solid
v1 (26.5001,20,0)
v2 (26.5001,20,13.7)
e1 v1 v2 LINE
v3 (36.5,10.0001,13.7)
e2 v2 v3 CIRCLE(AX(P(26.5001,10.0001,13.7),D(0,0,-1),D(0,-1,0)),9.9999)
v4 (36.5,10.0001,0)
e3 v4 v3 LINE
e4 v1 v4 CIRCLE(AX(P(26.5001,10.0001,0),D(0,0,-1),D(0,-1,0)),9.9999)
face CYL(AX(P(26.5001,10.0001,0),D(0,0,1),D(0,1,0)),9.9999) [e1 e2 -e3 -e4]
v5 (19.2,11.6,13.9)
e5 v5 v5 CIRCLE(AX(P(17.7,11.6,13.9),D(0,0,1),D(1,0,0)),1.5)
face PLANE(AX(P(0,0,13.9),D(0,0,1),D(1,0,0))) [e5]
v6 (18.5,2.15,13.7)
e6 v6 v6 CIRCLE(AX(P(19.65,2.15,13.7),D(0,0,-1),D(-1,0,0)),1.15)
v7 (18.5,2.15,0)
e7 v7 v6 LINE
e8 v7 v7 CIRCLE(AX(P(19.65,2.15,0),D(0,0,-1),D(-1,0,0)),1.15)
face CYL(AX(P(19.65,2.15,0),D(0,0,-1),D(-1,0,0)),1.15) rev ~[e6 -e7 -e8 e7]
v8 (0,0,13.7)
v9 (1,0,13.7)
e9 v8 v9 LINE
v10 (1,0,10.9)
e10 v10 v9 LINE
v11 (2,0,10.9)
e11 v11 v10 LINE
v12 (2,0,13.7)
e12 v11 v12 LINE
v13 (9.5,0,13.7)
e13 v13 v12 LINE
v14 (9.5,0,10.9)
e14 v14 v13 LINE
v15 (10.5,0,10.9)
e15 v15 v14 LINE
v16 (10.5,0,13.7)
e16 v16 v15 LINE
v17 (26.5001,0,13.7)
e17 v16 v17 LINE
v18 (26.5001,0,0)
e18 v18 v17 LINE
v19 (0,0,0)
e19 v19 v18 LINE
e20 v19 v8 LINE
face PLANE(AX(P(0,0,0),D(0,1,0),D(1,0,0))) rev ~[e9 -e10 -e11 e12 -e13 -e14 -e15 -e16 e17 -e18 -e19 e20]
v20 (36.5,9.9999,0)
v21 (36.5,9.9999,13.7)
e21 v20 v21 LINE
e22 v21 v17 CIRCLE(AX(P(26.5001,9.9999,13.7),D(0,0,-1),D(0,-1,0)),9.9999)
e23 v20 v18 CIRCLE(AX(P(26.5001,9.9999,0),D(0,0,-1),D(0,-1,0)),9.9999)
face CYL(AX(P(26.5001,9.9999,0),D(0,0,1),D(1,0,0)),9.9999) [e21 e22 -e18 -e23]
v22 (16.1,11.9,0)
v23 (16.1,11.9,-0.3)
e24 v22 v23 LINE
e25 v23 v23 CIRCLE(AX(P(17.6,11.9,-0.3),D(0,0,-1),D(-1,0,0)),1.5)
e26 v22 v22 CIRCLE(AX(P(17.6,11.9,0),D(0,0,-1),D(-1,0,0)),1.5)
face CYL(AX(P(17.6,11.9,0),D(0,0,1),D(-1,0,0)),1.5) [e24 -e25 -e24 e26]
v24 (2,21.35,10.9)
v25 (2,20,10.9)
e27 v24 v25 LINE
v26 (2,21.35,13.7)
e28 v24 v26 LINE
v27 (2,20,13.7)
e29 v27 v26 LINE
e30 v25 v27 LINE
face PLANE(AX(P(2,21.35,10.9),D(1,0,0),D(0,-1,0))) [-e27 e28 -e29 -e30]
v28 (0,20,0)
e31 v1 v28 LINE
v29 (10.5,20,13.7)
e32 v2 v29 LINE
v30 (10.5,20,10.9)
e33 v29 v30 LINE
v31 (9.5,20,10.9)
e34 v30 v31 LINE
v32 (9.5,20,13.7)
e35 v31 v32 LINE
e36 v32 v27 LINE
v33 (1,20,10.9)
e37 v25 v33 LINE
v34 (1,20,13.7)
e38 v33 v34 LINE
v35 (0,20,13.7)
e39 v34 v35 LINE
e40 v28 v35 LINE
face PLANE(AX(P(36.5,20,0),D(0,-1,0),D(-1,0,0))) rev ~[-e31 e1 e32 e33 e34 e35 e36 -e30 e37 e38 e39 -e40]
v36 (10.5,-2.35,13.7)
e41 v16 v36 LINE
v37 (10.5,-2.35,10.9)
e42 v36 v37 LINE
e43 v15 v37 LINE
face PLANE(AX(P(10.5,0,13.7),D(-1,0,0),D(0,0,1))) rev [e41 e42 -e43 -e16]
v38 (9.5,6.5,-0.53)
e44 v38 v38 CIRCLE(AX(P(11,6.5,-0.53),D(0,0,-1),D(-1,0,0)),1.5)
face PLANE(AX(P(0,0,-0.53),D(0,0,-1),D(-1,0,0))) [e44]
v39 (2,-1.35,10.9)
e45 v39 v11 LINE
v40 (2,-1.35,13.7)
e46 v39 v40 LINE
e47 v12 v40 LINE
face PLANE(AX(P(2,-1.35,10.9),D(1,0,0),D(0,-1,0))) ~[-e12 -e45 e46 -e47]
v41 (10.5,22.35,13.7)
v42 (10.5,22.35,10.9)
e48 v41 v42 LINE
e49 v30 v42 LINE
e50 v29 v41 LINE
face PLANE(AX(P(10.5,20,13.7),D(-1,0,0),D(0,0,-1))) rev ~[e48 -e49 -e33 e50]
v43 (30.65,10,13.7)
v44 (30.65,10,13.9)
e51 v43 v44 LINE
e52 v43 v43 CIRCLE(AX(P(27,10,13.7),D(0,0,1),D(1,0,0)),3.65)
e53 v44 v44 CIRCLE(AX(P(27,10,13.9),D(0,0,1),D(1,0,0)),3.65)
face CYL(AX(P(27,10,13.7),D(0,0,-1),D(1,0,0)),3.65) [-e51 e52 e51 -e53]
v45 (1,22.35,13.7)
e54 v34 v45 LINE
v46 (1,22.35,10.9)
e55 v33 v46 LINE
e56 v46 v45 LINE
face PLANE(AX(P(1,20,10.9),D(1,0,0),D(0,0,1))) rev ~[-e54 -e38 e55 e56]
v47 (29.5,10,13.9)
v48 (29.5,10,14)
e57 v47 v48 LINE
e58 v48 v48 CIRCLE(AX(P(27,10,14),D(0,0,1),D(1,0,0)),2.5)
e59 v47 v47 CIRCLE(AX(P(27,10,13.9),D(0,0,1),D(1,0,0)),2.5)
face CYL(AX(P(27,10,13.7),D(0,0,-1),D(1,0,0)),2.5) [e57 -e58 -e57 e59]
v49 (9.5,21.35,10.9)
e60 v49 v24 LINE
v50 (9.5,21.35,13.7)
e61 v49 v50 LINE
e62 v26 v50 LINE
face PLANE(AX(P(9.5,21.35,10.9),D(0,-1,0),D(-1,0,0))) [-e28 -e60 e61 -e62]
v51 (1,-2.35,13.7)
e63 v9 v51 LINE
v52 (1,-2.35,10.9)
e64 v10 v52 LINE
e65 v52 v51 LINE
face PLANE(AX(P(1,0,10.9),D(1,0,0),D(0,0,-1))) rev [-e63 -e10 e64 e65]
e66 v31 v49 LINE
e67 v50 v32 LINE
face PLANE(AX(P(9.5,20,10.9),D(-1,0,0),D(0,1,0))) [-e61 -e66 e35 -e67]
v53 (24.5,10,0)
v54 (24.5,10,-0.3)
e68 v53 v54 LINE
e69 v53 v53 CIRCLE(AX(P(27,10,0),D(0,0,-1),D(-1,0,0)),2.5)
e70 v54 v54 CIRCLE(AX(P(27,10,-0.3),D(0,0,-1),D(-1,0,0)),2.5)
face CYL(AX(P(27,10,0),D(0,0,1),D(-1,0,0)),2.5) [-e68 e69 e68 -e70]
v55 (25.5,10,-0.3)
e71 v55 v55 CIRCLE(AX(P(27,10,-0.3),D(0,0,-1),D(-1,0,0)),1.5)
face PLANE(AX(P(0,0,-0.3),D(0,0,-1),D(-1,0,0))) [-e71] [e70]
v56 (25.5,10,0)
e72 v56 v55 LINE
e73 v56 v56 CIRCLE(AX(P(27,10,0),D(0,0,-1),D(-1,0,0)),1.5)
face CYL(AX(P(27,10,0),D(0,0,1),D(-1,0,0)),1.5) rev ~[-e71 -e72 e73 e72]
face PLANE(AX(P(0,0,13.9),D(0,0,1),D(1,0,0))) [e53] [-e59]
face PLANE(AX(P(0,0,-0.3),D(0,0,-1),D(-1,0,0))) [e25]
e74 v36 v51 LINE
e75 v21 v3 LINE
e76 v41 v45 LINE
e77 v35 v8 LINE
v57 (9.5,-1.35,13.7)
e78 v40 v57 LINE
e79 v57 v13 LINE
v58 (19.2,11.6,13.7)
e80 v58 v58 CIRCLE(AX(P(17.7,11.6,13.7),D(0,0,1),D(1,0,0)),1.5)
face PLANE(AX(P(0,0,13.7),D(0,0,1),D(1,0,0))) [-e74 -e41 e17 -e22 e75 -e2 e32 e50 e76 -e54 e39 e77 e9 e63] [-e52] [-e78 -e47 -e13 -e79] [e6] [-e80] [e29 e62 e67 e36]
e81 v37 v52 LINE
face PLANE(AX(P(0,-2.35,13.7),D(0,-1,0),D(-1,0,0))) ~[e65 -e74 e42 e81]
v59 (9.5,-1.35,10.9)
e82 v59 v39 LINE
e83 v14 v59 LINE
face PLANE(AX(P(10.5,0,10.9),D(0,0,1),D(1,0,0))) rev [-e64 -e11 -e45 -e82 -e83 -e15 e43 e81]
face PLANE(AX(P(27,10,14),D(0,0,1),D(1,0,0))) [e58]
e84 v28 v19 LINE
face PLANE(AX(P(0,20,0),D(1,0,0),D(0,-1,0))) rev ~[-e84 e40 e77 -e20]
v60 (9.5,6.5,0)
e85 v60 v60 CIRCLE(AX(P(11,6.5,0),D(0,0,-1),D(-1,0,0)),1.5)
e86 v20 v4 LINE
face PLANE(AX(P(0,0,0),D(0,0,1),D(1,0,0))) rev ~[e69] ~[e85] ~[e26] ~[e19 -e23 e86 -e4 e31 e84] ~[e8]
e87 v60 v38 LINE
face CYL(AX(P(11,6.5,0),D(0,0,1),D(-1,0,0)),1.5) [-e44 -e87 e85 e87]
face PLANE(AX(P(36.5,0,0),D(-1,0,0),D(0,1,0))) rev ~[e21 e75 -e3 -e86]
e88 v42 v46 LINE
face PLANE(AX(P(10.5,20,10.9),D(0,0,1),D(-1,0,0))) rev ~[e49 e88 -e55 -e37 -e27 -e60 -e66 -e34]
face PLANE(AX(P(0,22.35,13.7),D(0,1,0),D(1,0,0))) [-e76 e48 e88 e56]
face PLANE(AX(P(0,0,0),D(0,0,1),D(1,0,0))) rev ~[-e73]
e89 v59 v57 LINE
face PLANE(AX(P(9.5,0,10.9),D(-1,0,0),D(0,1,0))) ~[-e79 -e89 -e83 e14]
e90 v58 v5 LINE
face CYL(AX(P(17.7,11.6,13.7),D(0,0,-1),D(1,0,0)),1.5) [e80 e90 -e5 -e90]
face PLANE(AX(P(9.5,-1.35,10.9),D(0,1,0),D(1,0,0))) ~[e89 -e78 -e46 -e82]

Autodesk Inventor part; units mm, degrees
ref_plane "YZ Plane" through (0, 0, 0) normal (1, 0, 0) x (0, 1, 0)
ref_plane "XZ Plane" through (0, 0, 0) normal (0, 1, 0) x (-1, 0, 0)
sketch "Skizze1" plane through (0, 0, 0) normal (0, 0, 1) x (1, 0, 0)
  line L0 (0, 0) -> (36.5, 0)
  line L1 (36.5, 0) -> (36.5, 20)
  line L2 (36.5, 20) -> (0, 20)
  line L3 (0, 20) -> (0, 0)
  dimension "d0" = 36.5
  dimension "d1" = 20
extrude "Extrusion1" add sketch "Skizze1" along normal blind 13.7
ref_plane "Arbeitsebene1" through (0, 10, 0) normal (0, 1, 0) x (1, 0, 0)
fillet "Rundung1" radius 10 2 edges at (36.5, 20, 6.85) (36.5, 0, 6.85)
sketch "Skizze2" plane through (0, 0, 0) normal (0, 0, -1) x (-1, 0, 0)
  arc A0 (-26.5, 20) -> (-26.5, 0) centre (-26.5, 10) ccw projected
  circle A1 centre (-27, 10) radius 2.5
  circle A2 centre (-27, 10) radius 1.5
  dimension "d5" = 5
  dimension "d6" = 10
  dimension "d7" = 12
  dimension "d8" = 3
extrude "Extrusion2" add sketch "Skizze2" along normal blind 0.3
sketch "Skizze4" plane through (0, 0, 0) normal (0, 0, -1) x (-1, 0, 0)
  line L0 (0, 0) -> (-26.5, 0) projected
  line L1 (0, 20) -> (0, 0) projected
  circle A0 centre (-19.65, 2.15) radius 1.15
  dimension "d15" = 2.3
  dimension "d16" = 1
  dimension "d17" = 18.5
extrude "Extrusion4" cut sketch "Skizze4" against normal through all
sketch "Skizze5" plane through (0, 0, 0) normal (0, 0, -1) x (-1, 0, 0)
  line L0 (0, 0) -> (-26.5, 0) projected
  line L1 (0, 20) -> (0, 0) projected
  circle A0 centre (-11, 6.5) radius 1.5
  dimension "d21" = 3
  dimension "d23" = 5
  dimension "d24" = 9.5
extrude "Extrusion8" add sketch "Skizze5" along normal blind 0.53
sketch "Skizze6" plane through (0, 0, 0) normal (0, 0, -1) x (-1, 0, 0)
  line L0 (0, 20) -> (0, 0) projected
  line L1 (-26.5, 20) -> (0, 20) projected
  circle A0 centre (-17.6, 11.9) radius 1.5
  dimension "d27" = 3
  dimension "d28" = 6.6
  dimension "d29" = 16.1
extrude "Extrusion5" add sketch "Skizze6" along normal up to surface (0.3 mm away)
sketch "Skizze7" plane through (0, 0, 13.7) normal (0, 0, 1) x (1, 0, 0)
  line L0 (0, 20) -> (0, 0) projected
  line L1 (0, 0) -> (26.5, 0) projected
  circle A0 centre (27, 10) radius 2.5 projected
  circle A1 centre (27, 10) radius 3.65
  circle A2 centre (17.7, 11.6) radius 1.5
  dimension "d34" = 7.3
  dimension "d40" = 3
  dimension "d42" = 10.1
  dimension "d43" = 19.2
extrude "Extrusion9" add sketch "Skizze7" along normal blind 0.2
sketch "Skizze8" plane through (27, 10, 13.7) normal (0, 0, 1) x (1, 0, 0)
  circle A0 centre (0, 0) radius 2.5 projected
  point P0 (-27, -10)
extrude "Extrusion10" add sketch "Skizze8" along normal blind 0.3
sketch "Skizze11" plane through (0, 20, 13.7) normal (0, 1, 0) x (1, 0, 0)
  line L0 (0, 13.7) -> (0, 0) projected
  line L1 (26.5, 0) -> (0, 0) projected
  line L2 (1, 0) -> (10.5, 0)
  line L3 (10.5, 0) -> (10.5, 2.8)
  line L4 (10.5, 2.8) -> (1, 2.8)
  line L5 (1, 2.8) -> (1, 0)
  dimension "d49" = 9.5
  dimension "d50" = 2.8
  dimension "d51" = 1
extrude "Extrusion11" add sketch "Skizze11" along normal blind 2.35
sketch "Skizze12" plane through (10.5, 20, 10.9) normal (0, 0, -1) x (-1, 0, 0)
  line L0 (9.5, 0) -> (0, 0) projected
  line L1 (9.5, 0) -> (9.5, 2.35) projected
  line L2 (0, 2.35) -> (9.5, 2.35) projected
  line L3 (0, 0) -> (0, 2.35) projected
  line L4 (1, 1.35) -> (8.5, 1.35)
  line L5 (8.5, 1.35) -> (8.5, 0)
  line L6 (8.5, 0) -> (1, 0)
  line L7 (1, 0) -> (1, 1.35)
  point P0 (10.5, -20)
  dimension "d54" = 1
  dimension "d55" = 1
  dimension "d56" = 1
extrude "Extrusion12" cut sketch "Skizze12" against normal through all contours L0 L7 L4 L5
mirror "Spiegeln1" about plane through (0, 10, 0) normal (0, 1, 0) of "Extrusion12", "Extrusion11"
properties part number "front"
